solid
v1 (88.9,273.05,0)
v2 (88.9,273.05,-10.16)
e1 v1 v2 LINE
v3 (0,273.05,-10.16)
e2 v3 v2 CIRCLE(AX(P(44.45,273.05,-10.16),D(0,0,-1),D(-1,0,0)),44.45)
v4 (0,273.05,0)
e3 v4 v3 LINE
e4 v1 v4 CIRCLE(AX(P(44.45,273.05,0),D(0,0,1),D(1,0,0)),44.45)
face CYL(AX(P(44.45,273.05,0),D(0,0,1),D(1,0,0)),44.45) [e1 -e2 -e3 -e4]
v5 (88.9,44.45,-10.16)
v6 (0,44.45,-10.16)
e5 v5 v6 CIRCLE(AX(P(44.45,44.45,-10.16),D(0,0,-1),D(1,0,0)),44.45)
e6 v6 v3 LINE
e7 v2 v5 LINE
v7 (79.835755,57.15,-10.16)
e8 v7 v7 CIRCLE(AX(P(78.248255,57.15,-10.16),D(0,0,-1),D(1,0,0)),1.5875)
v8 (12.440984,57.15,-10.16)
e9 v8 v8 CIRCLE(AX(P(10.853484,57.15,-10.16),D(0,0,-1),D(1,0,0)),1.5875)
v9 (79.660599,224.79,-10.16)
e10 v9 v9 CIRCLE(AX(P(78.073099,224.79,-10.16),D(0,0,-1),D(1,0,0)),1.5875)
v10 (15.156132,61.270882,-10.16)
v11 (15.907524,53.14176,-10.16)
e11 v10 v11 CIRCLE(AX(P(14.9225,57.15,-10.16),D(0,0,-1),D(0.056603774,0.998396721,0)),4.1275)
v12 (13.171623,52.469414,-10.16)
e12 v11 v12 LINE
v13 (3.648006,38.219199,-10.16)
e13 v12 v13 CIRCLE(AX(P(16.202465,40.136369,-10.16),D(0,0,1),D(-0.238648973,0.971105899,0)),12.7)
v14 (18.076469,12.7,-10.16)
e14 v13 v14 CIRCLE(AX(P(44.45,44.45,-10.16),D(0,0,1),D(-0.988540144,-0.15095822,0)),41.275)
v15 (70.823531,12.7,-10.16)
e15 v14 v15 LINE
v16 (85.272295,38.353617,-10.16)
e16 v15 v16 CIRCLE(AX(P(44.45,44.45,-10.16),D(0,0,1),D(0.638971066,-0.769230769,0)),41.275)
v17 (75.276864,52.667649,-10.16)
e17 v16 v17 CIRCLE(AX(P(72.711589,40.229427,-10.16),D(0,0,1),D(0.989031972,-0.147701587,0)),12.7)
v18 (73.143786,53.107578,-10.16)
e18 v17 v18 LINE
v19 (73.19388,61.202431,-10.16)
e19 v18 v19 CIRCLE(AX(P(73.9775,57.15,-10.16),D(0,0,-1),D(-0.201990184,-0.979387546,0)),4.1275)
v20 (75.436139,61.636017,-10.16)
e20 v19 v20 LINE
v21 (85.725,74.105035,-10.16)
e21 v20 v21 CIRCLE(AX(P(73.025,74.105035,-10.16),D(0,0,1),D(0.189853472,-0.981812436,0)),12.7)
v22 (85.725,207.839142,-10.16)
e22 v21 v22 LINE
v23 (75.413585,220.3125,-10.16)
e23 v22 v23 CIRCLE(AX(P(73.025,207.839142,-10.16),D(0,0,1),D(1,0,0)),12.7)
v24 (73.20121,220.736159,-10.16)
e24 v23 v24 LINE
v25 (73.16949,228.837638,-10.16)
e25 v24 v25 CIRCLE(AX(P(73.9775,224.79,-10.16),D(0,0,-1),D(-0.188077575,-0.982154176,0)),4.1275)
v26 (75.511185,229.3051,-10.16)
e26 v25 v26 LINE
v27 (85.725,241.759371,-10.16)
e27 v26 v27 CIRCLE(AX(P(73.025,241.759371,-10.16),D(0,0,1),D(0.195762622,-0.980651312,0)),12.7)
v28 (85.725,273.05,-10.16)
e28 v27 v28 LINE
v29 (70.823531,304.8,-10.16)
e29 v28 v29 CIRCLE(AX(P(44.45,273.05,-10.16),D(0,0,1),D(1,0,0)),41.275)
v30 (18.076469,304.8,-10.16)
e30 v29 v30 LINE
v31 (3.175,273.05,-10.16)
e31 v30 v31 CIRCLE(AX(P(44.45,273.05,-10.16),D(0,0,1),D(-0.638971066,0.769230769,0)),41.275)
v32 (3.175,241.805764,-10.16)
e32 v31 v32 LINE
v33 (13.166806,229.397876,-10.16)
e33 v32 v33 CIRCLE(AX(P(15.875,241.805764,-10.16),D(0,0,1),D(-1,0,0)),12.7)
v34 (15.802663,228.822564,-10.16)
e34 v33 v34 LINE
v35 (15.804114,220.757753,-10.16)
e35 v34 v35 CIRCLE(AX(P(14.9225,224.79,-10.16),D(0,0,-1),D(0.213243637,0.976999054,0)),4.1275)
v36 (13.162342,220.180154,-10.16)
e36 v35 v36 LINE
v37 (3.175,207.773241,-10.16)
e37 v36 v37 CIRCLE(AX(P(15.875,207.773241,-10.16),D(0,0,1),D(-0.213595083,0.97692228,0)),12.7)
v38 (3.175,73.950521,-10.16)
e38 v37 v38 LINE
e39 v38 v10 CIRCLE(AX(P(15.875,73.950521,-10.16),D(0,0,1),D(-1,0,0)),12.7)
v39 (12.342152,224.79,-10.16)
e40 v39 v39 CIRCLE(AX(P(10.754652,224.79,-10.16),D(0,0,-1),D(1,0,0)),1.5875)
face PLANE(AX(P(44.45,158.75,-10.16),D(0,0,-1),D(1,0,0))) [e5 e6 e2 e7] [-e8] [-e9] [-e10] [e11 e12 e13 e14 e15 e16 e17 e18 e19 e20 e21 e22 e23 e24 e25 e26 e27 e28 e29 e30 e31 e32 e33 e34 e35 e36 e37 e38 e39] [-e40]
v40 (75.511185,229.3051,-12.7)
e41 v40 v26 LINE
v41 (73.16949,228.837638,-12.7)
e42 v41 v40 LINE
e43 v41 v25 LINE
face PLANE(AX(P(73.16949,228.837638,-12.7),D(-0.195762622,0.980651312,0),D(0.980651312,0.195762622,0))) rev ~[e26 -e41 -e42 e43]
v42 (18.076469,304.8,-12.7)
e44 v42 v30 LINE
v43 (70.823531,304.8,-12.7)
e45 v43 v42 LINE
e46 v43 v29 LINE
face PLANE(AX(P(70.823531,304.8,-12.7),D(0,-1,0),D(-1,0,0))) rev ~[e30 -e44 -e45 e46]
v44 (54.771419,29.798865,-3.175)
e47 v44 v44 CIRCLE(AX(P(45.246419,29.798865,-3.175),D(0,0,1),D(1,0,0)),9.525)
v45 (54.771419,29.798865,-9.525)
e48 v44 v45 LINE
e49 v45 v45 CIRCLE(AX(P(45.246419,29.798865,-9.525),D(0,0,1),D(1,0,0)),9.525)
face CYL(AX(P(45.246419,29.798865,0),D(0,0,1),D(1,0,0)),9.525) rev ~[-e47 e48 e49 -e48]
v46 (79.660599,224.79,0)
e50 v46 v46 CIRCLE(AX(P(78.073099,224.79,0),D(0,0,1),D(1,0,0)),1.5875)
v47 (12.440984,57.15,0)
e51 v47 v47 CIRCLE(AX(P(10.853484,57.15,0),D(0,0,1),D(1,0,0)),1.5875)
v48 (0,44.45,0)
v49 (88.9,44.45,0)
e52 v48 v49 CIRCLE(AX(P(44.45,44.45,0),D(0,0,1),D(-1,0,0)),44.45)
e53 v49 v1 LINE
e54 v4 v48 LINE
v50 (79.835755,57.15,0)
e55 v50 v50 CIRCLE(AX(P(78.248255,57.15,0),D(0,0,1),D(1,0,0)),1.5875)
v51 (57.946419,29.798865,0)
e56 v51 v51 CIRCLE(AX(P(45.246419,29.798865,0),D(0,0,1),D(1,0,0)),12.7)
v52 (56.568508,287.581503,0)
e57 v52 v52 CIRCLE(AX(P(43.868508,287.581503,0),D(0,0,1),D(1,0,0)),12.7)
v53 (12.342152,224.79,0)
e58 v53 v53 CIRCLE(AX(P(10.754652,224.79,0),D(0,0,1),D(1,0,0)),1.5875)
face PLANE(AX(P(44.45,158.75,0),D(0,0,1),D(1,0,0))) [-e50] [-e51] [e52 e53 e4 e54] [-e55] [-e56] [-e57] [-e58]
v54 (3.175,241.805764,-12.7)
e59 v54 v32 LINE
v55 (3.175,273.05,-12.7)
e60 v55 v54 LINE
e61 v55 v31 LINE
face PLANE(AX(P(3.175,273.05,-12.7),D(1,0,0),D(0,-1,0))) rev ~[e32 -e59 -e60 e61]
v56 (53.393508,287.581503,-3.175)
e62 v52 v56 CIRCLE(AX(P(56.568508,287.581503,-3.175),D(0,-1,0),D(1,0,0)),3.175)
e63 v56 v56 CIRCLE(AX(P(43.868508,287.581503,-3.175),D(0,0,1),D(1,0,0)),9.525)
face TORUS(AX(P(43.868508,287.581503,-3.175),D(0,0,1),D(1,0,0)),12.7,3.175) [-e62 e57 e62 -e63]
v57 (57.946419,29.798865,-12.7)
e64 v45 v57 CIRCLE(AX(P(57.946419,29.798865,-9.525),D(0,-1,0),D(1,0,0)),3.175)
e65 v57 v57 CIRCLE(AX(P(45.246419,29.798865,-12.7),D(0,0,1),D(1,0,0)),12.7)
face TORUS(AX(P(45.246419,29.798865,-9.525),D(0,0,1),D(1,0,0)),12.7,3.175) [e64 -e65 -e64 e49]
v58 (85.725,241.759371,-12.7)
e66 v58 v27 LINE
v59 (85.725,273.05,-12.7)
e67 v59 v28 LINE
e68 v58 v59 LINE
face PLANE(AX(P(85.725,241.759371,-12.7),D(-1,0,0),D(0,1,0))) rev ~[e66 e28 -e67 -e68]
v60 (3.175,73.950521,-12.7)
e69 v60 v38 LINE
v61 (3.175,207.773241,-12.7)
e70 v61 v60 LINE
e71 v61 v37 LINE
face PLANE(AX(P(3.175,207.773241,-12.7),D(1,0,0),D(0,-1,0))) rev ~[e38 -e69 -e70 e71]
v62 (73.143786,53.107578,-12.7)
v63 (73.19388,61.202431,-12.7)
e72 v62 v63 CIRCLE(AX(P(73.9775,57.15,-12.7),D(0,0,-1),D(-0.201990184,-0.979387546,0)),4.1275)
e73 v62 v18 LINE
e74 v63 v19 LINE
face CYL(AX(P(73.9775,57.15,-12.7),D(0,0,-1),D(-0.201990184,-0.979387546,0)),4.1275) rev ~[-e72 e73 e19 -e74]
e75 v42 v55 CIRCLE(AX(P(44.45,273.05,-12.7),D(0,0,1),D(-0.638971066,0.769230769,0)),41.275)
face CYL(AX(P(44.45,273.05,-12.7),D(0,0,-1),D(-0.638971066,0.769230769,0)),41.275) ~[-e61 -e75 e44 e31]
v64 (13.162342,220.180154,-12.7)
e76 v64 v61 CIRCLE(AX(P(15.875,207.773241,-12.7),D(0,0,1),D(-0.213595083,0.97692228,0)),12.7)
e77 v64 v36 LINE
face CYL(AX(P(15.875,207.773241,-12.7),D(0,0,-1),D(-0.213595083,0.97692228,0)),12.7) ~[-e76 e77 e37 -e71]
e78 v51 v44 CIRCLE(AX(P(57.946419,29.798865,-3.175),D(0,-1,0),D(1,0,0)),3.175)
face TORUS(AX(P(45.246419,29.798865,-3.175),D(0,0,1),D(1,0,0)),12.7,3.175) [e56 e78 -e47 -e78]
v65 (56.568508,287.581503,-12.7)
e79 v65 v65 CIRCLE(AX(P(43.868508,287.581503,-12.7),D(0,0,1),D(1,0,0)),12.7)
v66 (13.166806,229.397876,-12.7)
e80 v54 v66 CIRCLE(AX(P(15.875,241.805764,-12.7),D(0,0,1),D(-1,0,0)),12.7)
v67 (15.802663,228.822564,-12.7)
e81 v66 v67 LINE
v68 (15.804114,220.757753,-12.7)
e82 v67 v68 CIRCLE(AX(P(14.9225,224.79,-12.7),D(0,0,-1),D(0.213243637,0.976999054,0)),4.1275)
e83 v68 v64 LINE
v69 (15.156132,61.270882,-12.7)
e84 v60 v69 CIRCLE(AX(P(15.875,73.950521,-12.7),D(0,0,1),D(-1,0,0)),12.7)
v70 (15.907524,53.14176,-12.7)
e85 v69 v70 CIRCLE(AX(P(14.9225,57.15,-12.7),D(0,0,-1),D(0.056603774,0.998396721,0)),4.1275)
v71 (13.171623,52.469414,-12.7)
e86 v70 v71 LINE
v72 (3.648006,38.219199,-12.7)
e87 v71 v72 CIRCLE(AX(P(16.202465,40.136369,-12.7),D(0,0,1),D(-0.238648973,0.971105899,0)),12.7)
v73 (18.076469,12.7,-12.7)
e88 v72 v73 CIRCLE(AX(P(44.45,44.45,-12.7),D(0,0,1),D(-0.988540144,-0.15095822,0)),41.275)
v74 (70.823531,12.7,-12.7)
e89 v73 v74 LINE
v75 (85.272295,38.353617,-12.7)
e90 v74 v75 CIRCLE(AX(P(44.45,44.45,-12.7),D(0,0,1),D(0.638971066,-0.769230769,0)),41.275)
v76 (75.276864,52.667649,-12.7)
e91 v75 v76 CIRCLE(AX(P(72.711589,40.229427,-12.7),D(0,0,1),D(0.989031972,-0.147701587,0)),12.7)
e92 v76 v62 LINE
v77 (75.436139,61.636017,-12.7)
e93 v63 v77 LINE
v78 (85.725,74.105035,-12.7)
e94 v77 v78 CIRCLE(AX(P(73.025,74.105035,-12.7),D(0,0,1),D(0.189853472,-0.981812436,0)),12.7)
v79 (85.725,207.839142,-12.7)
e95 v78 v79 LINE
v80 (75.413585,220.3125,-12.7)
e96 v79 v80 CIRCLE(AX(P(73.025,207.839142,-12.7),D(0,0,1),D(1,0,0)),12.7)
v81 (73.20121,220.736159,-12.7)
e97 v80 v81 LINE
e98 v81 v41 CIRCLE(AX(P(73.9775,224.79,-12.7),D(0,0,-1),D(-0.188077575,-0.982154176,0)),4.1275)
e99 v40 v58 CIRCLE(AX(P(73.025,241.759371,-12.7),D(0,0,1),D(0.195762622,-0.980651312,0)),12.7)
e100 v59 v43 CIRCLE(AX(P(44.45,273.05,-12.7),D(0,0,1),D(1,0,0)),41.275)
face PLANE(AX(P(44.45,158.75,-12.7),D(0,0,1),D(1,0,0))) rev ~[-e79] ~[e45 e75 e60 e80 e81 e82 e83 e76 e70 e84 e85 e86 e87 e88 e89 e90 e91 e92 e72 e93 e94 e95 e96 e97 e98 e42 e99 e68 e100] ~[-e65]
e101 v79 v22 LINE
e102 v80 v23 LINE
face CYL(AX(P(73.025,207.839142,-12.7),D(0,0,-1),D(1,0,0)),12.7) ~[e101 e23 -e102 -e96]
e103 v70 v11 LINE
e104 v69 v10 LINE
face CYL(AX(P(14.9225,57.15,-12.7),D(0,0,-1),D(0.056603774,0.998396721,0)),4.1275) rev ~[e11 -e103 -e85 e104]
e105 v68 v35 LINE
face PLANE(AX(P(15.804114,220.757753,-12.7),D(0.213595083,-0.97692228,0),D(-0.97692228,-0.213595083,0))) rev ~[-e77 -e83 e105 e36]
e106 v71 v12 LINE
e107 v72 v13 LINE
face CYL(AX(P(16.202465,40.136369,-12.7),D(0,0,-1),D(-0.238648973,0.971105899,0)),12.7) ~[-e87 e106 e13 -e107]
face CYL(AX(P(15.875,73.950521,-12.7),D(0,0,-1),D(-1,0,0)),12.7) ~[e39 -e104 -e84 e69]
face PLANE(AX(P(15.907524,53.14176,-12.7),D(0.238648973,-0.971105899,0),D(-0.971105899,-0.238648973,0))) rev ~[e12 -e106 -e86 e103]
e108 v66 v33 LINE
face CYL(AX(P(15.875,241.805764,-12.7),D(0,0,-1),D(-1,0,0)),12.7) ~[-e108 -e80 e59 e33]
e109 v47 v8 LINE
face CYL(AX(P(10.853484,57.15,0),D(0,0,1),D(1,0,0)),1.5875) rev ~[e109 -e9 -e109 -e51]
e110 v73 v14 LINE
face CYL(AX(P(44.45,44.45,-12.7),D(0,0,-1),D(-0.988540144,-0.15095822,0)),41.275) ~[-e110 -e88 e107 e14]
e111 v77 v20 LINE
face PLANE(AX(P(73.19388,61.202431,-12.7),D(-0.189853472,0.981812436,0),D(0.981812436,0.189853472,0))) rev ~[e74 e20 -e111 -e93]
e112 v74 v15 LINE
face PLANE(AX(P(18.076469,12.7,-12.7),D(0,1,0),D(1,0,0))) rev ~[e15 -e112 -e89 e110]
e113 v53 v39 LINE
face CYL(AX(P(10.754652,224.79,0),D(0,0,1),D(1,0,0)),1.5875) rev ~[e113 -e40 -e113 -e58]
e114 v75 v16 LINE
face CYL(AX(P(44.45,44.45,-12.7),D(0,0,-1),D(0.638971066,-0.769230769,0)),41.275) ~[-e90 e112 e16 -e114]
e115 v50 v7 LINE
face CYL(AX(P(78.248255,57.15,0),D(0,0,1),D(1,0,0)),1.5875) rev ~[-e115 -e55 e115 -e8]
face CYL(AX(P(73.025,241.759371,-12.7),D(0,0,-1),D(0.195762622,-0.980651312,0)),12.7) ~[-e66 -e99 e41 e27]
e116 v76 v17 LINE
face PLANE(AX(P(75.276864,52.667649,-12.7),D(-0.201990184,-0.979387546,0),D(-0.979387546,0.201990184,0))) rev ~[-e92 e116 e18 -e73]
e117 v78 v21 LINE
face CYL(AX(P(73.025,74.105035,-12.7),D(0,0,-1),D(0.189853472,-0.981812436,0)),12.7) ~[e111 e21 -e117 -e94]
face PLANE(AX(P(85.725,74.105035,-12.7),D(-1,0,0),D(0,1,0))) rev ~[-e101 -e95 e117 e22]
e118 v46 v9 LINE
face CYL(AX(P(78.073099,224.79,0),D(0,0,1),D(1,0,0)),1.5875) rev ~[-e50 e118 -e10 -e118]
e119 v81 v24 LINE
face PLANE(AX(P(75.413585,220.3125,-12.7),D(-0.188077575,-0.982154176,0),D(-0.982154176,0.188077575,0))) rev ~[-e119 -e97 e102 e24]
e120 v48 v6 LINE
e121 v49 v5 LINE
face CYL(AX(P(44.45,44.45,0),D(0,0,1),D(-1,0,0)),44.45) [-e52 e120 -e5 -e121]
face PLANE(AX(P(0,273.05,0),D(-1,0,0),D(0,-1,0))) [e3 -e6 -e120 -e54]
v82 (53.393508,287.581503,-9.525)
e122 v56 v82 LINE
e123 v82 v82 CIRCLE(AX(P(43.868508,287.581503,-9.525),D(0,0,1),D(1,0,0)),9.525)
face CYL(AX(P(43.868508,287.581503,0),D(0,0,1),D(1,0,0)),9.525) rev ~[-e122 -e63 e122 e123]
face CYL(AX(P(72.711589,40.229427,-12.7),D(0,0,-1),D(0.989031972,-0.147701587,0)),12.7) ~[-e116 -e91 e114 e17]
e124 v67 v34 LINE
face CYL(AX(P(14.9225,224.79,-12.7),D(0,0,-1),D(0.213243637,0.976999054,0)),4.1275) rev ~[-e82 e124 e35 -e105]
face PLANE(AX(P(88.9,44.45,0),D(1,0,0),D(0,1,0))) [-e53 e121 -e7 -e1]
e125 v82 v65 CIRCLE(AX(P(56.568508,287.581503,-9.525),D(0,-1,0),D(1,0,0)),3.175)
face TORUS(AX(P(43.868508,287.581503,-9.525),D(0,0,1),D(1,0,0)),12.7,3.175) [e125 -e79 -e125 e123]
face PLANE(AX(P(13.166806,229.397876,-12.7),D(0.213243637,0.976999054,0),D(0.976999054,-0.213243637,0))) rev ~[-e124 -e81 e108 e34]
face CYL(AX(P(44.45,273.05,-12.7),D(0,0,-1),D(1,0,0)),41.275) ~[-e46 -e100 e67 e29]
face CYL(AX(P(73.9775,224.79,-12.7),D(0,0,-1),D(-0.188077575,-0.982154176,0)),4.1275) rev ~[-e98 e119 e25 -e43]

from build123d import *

# Parameters (mm, degrees)
F1_R     = 1.5875
F1_R_2   = 9.525
F2_DEPTH = 12.7
F3_R     = 1.5875
F4_DEPTH = 2.54
F5_R     = 3.175


with BuildPart() as f2:
    # F1 (on Top) → F2 (new body)
    with BuildSketch(Plane.XY):
        with BuildLine():
            ThreePointArc((88.9, 273.05), (44.45, 317.5), (0, 273.05))
            Line((0, 273.05), (0, 44.45))
            ThreePointArc((0, 44.45), (44.45, 0), (88.9, 44.45))
            Line((88.9, 44.45), (88.9, 273.05))
        make_face()
        with Locations((10.853484273, 57.15)):
            Circle(F1_R, mode=Mode.SUBTRACT)
        with Locations((45.2464185655, 29.7988653183)):
            Circle(F1_R_2, mode=Mode.SUBTRACT)
        with Locations((78.2482549548, 57.15)):
            Circle(F1_R, mode=Mode.SUBTRACT)
        with Locations((10.7546523213, 224.79)):
            Circle(F1_R, mode=Mode.SUBTRACT)
        with Locations((43.8685081899, 287.5815033913)):
            Circle(F1_R_2, mode=Mode.SUBTRACT)
        with Locations((78.0730992556, 224.79)):
            Circle(F1_R, mode=Mode.SUBTRACT)
    extrude(amount=-F2_DEPTH)

    # F3 (on face) → F4 (cut)
    with BuildSketch(Plane(origin=(0, 0, -12.7), x_dir=(1, 0, 0), z_dir=(0, 0, -1))):
        with BuildLine():
            Line((0, -44.45), (0, -273.05))
            ThreePointArc((0, -273.05), (44.45, -317.5), (88.9, -273.05))
            Line((88.9, -273.05), (88.9, -44.45))
            ThreePointArc((88.9, -44.45), (44.45, 0), (0, -44.45))
        make_face()
        with Locations((10.7546523213, -224.79)):
            Circle(F3_R, mode=Mode.SUBTRACT)
        with Locations((78.0730992556, -224.79)):
            Circle(F3_R, mode=Mode.SUBTRACT)
        with BuildLine():
            Line((85.725, -241.7593711691), (85.725, -273.05))
            ThreePointArc((85.725, -273.05), (81.8143754619, -290.586506817), (70.8235307648, -304.8))
            Line((70.8235307648, -304.8), (18.0764692352, -304.8))
            ThreePointArc((18.0764692352, -304.8), (7.0856245381, -290.586506817), (3.175, -273.05))
            Line((3.175, -273.05), (3.175, -241.8057641091))
            ThreePointArc((3.175, -241.8057641091), (5.9834868143, -233.8403409002), (13.1668058106, -229.3978761248))
            Line((13.1668058106, -229.3978761248), (15.8026631116, -228.8225635949))
            ThreePointArc((15.8026631116, -228.8225635949), (19.0499999332, -224.7907424019), (15.8041137065, -220.757753291))
            Line((15.8041137065, -220.757753291), (13.1623424416, -220.1801542687))
            ThreePointArc((13.1623424416, -220.1801542687), (5.9820542559, -215.7368852391), (3.175, -207.7732413178))
            Line((3.175, -207.7732413178), (3.175, -73.9505208253))
            ThreePointArc((3.175, -73.9505208253), (6.6440839392, -65.2281250145), (15.1561320755, -61.2708824666))
            ThreePointArc((15.1561320755, -61.2708824666), (19.0324801493, -57.5298939621), (15.9075236341, -53.1417604001))
            Line((15.9075236341, -53.1417604001), (13.1716234423, -52.4694137795))
            ThreePointArc((13.1716234423, -52.4694137795), (5.6434616569, -47.1930989845), (3.648005568, -38.2191994597))
            ThreePointArc((3.648005568, -38.2191994597), (8.5202744008, -24.1354622654), (18.0764692352, -12.7))
            Line((18.0764692352, -12.7), (70.8235307648, -12.7))
            ThreePointArc((70.8235307648, -12.7), (80.4131304814, -24.1946582113), (85.2722946349, -38.3536169954))
            ThreePointArc((85.2722946349, -38.3536169954), (83.1241630177, -47.5004857983), (75.2768639326, -52.6676489864))
            Line((75.2768639326, -52.6676489864), (73.1437855148, -53.1075779034))
            ThreePointArc((73.1437855148, -53.1075779034), (69.850079032, -57.1755421779), (73.1938797929, -61.2024308286))
            Line((73.1938797929, -61.2024308286), (75.4361390988, -61.6360174279))
            ThreePointArc((75.4361390988, -61.6360174279), (82.8206997339, -66.0220738553), (85.725, -74.1050353622))
            Line((85.725, -74.1050353622), (85.725, -207.8391418625))
            ThreePointArc((85.725, -207.8391418625), (82.8133867938, -215.9309577263), (75.4135852009, -220.3124999003))
            Line((75.4135852009, -220.3124999003), (73.2012098097, -220.7361586377))
            ThreePointArc((73.2012098097, -220.7361586377), (69.8500316367, -224.7738395666), (73.1694897792, -228.8376382908))
            Line((73.1694897792, -228.8376382908), (75.5111852948, -229.3050995051))
            ThreePointArc((75.5111852948, -229.3050995051), (82.844993718, -233.7059418761), (85.725, -241.7593711691))
        make_face(mode=Mode.SUBTRACT)
        with Locations((10.853484273, -57.15)):
            Circle(F3_R, mode=Mode.SUBTRACT)
        with Locations((78.2482549548, -57.15)):
            Circle(F3_R, mode=Mode.SUBTRACT)
    extrude(amount=-F4_DEPTH, mode=Mode.SUBTRACT)

    # F5
    f5_edges = [f2.edges().sort_by_distance(p)[0] for p in [
        (35.721419, 29.798865, 0),
        (35.721419, 29.798865, -12.7),
        (34.343508, 287.581503, 0),
        (34.343508, 287.581503, -12.7),
    ]]
    fillet(f5_edges, radius=F5_R)


solid = f2.part
